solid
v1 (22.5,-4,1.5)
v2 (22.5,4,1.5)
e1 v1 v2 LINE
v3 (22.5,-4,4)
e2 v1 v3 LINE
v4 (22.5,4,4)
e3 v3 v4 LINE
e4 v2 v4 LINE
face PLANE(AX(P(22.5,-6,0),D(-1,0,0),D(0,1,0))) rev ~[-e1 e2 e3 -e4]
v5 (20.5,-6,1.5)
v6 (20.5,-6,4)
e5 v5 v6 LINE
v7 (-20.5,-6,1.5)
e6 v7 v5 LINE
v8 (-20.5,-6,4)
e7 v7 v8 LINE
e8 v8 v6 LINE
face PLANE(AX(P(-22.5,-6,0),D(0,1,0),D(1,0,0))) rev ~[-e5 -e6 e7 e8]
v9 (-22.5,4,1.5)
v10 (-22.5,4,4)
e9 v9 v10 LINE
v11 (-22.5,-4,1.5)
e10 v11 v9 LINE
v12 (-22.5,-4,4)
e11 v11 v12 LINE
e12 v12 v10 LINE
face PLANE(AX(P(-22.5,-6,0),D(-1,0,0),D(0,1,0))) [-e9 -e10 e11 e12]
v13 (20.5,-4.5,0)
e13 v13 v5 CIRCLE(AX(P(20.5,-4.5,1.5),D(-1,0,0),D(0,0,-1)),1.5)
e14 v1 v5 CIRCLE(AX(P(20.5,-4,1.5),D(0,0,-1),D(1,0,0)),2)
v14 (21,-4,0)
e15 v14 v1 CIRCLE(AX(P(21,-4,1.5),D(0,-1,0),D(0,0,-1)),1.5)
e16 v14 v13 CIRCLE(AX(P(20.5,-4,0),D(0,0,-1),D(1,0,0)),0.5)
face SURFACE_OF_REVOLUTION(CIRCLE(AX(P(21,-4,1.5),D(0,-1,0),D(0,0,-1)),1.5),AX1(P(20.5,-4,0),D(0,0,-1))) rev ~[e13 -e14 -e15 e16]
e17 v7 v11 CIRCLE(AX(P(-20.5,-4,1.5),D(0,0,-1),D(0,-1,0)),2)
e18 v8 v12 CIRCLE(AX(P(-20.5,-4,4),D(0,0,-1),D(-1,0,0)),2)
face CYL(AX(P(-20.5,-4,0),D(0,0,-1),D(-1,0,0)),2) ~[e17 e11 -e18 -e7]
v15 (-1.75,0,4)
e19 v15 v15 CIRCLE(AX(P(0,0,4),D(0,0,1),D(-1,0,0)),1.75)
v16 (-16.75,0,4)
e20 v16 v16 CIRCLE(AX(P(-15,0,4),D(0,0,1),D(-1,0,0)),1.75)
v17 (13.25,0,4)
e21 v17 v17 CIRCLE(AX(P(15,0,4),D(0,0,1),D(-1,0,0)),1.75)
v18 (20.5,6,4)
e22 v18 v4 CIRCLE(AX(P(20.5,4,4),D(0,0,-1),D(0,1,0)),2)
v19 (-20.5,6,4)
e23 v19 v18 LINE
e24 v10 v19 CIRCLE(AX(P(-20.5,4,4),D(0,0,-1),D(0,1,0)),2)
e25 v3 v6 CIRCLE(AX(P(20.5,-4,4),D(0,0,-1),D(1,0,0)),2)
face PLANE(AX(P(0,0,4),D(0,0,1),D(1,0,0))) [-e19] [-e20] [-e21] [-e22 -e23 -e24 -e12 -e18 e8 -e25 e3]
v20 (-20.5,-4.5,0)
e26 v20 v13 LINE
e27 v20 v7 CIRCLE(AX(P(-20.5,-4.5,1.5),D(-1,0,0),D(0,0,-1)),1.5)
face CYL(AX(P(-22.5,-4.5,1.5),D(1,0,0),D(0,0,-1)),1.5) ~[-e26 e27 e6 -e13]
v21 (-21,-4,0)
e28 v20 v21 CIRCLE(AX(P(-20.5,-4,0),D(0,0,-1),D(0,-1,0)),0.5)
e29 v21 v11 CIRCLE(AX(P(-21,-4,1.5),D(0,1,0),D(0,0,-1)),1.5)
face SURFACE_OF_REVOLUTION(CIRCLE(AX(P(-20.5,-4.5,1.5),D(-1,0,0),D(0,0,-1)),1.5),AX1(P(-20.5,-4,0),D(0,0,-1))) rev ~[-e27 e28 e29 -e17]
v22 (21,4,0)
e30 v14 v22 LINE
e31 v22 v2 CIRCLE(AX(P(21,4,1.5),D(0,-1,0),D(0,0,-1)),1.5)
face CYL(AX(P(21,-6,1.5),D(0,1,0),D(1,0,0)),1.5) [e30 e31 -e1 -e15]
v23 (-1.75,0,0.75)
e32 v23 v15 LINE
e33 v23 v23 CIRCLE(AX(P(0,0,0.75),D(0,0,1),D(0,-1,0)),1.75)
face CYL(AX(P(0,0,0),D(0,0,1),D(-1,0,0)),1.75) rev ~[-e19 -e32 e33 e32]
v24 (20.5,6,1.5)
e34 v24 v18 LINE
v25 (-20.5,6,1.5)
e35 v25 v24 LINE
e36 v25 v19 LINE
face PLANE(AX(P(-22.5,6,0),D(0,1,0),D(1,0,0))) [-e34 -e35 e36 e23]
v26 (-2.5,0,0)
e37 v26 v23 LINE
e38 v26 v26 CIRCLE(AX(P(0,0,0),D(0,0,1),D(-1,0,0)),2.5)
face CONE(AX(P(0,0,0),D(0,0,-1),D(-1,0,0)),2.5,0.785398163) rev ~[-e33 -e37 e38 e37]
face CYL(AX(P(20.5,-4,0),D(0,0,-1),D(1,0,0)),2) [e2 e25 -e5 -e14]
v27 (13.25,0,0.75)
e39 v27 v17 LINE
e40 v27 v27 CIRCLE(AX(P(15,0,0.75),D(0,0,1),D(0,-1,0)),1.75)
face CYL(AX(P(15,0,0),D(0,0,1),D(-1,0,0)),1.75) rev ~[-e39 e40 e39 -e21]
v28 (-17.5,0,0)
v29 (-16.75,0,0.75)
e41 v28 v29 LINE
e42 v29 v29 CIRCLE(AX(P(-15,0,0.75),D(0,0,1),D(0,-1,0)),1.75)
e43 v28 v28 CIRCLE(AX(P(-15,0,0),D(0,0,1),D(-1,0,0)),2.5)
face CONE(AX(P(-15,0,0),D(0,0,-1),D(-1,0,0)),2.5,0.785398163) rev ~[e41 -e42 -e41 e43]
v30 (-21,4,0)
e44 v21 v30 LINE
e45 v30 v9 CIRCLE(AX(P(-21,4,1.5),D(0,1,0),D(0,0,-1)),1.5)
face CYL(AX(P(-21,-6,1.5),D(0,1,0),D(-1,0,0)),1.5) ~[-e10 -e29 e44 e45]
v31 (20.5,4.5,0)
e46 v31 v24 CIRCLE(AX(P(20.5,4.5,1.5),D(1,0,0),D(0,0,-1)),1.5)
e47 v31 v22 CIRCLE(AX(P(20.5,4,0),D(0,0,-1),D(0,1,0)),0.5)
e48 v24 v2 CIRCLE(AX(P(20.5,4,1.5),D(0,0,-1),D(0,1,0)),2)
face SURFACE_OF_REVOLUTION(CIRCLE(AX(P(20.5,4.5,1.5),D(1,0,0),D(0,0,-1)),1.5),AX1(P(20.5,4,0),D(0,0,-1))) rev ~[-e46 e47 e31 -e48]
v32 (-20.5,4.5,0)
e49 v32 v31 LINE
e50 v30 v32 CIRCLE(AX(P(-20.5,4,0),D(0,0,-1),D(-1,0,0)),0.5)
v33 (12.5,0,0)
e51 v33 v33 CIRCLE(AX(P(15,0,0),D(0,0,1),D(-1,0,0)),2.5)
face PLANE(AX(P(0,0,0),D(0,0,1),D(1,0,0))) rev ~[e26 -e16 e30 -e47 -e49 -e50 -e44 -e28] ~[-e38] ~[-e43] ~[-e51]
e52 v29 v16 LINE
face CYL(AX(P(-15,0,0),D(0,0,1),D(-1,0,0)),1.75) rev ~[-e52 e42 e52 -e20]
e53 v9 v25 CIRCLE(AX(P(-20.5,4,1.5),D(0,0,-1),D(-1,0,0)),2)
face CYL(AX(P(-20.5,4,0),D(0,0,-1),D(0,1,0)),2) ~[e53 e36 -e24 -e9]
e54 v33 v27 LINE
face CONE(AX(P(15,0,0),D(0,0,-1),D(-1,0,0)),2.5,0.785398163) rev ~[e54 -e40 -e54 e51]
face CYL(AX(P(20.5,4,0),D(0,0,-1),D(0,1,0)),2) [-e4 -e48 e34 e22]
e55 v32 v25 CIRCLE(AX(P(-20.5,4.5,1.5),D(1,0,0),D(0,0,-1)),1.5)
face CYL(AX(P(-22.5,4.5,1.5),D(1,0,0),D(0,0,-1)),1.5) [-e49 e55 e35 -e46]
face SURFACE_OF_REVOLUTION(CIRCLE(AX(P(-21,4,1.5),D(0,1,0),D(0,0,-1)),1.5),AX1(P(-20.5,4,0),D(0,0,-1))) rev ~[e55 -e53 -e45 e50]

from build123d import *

# Parameters (mm, degrees)
F0_W           = 45
F0_H           = 12
F1_DEPTH       = 4
F2_D           = 3.5
F2_CSINK_D     = 5
F2_CSINK_ANGLE = 90
F3_R           = 1.5
F4_T1_DEPTH    = 9
F4_T4_ANGLE    = 90
F4_T6_ANGLE    = 90
F4_T8_ANGLE    = 90
F4_T10_ANGLE   = 90


# Not quite as in the source:
# - a fillet or chamfer that OpenCascade refuses, or shapes differently, is made with other operations: its cross-section is extruded or revolved along the edge and cut away or added


with BuildPart() as f1:
    # F0 (on Top) → F1 (new body)
    with BuildSketch(Plane.XY):
        Rectangle(F0_W, F0_H)
    extrude(amount=F1_DEPTH)

    # F2 (through all)
    with Locations(Plane(origin=(0, 0, 0), x_dir=(1, 0, 0), z_dir=(0, 0, -1))):
        with Locations((-15, 0), (0, 0), (15, 0)):
            CounterSinkHole(F2_D / 2, F2_CSINK_D / 2, counter_sink_angle=F2_CSINK_ANGLE)

    # F3
    f3_edges = [f1.edges().sort_by_distance(p)[0] for p in [
        (0, -6, 0),
        (-22.5, 0, 0),
        (0, 6, 0),
        (22.5, 0, 0),
    ]]
    fillet(f3_edges, radius=F3_R)

    # F4: fillet of radius 2 on 4 edges, made by hand

    # F4_s2 → F4_t1 (cut)
    with BuildSketch(Plane.XY):
        with BuildLine():
            ThreePointArc((22.5, -4), (21.9142135624, -5.4142135624), (20.5, -6))
            Line((20.5, -6), (22.5, -6))
            Line((22.5, -6), (22.5, -4))
        make_face()
        with BuildLine():
            ThreePointArc((20.5, 6), (21.9142135624, 5.4142135624), (22.5, 4))
            Line((22.5, 4), (22.5, 6))
            Line((22.5, 6), (20.5, 6))
        make_face()
        with BuildLine():
            ThreePointArc((-22.5, -4), (-21.9142135624, -5.4142135624), (-20.5, -6))
            Line((-20.5, -6), (-22.5, -6))
            Line((-22.5, -6), (-22.5, -4))
        make_face()
        with BuildLine():
            ThreePointArc((-20.5, 6), (-21.9142135624, 5.4142135624), (-22.5, 4))
            Line((-22.5, 4), (-22.5, 6))
            Line((-22.5, 6), (-20.5, 6))
        make_face()
    extrude(amount=F4_T1_DEPTH, mode=Mode.SUBTRACT)

    # F4_s3 → F4_t4 (revolve, cut)
    with BuildSketch(Plane.XZ.offset(-4)):
        with BuildLine():
            ThreePointArc((-21, 0), (-22.0606601718, 0.4393398282), (-22.5, 1.5))
            Line((-22.5, 1.5), (-22.5, 0))
            Line((-22.5, 0), (-21, 0))
        make_face()
    revolve(axis=Axis((-20.5, 4, 0), (0, 0, -1)), revolution_arc=F4_T4_ANGLE, mode=Mode.SUBTRACT)

    # F4_s5 → F4_t6 (revolve, cut)
    with BuildSketch(Plane.YZ.offset(-20.5)):
        with BuildLine():
            ThreePointArc((-4.5, 0), (-5.5606601718, 0.4393398282), (-6, 1.5))
            Line((-6, 1.5), (-6, 0))
            Line((-6, 0), (-4.5, 0))
        make_face()
    revolve(axis=Axis((-20.5, -4, 0), (0, 0, -1)), revolution_arc=F4_T6_ANGLE, mode=Mode.SUBTRACT)

    # F4_s7 → F4_t8 (revolve, cut)
    with BuildSketch(Plane.YZ.offset(20.5)):
        with BuildLine():
            ThreePointArc((4.5, 0), (5.5606601718, 0.4393398282), (6, 1.5))
            Line((6, 1.5), (6, 0))
            Line((6, 0), (4.5, 0))
        make_face()
    revolve(axis=Axis((20.5, 4, 0), (0, 0, -1)), revolution_arc=F4_T8_ANGLE, mode=Mode.SUBTRACT)

    # F4_s9 → F4_t10 (revolve, cut)
    with BuildSketch(Plane.XZ.offset(4)):
        with BuildLine():
            ThreePointArc((21, 0), (22.0606601718, 0.4393398282), (22.5, 1.5))
            Line((22.5, 1.5), (22.5, 0))
            Line((22.5, 0), (21, 0))
        make_face()
    revolve(axis=Axis((20.5, -4, 0), (0, 0, -1)), revolution_arc=F4_T10_ANGLE, mode=Mode.SUBTRACT)


solid = f1.part
